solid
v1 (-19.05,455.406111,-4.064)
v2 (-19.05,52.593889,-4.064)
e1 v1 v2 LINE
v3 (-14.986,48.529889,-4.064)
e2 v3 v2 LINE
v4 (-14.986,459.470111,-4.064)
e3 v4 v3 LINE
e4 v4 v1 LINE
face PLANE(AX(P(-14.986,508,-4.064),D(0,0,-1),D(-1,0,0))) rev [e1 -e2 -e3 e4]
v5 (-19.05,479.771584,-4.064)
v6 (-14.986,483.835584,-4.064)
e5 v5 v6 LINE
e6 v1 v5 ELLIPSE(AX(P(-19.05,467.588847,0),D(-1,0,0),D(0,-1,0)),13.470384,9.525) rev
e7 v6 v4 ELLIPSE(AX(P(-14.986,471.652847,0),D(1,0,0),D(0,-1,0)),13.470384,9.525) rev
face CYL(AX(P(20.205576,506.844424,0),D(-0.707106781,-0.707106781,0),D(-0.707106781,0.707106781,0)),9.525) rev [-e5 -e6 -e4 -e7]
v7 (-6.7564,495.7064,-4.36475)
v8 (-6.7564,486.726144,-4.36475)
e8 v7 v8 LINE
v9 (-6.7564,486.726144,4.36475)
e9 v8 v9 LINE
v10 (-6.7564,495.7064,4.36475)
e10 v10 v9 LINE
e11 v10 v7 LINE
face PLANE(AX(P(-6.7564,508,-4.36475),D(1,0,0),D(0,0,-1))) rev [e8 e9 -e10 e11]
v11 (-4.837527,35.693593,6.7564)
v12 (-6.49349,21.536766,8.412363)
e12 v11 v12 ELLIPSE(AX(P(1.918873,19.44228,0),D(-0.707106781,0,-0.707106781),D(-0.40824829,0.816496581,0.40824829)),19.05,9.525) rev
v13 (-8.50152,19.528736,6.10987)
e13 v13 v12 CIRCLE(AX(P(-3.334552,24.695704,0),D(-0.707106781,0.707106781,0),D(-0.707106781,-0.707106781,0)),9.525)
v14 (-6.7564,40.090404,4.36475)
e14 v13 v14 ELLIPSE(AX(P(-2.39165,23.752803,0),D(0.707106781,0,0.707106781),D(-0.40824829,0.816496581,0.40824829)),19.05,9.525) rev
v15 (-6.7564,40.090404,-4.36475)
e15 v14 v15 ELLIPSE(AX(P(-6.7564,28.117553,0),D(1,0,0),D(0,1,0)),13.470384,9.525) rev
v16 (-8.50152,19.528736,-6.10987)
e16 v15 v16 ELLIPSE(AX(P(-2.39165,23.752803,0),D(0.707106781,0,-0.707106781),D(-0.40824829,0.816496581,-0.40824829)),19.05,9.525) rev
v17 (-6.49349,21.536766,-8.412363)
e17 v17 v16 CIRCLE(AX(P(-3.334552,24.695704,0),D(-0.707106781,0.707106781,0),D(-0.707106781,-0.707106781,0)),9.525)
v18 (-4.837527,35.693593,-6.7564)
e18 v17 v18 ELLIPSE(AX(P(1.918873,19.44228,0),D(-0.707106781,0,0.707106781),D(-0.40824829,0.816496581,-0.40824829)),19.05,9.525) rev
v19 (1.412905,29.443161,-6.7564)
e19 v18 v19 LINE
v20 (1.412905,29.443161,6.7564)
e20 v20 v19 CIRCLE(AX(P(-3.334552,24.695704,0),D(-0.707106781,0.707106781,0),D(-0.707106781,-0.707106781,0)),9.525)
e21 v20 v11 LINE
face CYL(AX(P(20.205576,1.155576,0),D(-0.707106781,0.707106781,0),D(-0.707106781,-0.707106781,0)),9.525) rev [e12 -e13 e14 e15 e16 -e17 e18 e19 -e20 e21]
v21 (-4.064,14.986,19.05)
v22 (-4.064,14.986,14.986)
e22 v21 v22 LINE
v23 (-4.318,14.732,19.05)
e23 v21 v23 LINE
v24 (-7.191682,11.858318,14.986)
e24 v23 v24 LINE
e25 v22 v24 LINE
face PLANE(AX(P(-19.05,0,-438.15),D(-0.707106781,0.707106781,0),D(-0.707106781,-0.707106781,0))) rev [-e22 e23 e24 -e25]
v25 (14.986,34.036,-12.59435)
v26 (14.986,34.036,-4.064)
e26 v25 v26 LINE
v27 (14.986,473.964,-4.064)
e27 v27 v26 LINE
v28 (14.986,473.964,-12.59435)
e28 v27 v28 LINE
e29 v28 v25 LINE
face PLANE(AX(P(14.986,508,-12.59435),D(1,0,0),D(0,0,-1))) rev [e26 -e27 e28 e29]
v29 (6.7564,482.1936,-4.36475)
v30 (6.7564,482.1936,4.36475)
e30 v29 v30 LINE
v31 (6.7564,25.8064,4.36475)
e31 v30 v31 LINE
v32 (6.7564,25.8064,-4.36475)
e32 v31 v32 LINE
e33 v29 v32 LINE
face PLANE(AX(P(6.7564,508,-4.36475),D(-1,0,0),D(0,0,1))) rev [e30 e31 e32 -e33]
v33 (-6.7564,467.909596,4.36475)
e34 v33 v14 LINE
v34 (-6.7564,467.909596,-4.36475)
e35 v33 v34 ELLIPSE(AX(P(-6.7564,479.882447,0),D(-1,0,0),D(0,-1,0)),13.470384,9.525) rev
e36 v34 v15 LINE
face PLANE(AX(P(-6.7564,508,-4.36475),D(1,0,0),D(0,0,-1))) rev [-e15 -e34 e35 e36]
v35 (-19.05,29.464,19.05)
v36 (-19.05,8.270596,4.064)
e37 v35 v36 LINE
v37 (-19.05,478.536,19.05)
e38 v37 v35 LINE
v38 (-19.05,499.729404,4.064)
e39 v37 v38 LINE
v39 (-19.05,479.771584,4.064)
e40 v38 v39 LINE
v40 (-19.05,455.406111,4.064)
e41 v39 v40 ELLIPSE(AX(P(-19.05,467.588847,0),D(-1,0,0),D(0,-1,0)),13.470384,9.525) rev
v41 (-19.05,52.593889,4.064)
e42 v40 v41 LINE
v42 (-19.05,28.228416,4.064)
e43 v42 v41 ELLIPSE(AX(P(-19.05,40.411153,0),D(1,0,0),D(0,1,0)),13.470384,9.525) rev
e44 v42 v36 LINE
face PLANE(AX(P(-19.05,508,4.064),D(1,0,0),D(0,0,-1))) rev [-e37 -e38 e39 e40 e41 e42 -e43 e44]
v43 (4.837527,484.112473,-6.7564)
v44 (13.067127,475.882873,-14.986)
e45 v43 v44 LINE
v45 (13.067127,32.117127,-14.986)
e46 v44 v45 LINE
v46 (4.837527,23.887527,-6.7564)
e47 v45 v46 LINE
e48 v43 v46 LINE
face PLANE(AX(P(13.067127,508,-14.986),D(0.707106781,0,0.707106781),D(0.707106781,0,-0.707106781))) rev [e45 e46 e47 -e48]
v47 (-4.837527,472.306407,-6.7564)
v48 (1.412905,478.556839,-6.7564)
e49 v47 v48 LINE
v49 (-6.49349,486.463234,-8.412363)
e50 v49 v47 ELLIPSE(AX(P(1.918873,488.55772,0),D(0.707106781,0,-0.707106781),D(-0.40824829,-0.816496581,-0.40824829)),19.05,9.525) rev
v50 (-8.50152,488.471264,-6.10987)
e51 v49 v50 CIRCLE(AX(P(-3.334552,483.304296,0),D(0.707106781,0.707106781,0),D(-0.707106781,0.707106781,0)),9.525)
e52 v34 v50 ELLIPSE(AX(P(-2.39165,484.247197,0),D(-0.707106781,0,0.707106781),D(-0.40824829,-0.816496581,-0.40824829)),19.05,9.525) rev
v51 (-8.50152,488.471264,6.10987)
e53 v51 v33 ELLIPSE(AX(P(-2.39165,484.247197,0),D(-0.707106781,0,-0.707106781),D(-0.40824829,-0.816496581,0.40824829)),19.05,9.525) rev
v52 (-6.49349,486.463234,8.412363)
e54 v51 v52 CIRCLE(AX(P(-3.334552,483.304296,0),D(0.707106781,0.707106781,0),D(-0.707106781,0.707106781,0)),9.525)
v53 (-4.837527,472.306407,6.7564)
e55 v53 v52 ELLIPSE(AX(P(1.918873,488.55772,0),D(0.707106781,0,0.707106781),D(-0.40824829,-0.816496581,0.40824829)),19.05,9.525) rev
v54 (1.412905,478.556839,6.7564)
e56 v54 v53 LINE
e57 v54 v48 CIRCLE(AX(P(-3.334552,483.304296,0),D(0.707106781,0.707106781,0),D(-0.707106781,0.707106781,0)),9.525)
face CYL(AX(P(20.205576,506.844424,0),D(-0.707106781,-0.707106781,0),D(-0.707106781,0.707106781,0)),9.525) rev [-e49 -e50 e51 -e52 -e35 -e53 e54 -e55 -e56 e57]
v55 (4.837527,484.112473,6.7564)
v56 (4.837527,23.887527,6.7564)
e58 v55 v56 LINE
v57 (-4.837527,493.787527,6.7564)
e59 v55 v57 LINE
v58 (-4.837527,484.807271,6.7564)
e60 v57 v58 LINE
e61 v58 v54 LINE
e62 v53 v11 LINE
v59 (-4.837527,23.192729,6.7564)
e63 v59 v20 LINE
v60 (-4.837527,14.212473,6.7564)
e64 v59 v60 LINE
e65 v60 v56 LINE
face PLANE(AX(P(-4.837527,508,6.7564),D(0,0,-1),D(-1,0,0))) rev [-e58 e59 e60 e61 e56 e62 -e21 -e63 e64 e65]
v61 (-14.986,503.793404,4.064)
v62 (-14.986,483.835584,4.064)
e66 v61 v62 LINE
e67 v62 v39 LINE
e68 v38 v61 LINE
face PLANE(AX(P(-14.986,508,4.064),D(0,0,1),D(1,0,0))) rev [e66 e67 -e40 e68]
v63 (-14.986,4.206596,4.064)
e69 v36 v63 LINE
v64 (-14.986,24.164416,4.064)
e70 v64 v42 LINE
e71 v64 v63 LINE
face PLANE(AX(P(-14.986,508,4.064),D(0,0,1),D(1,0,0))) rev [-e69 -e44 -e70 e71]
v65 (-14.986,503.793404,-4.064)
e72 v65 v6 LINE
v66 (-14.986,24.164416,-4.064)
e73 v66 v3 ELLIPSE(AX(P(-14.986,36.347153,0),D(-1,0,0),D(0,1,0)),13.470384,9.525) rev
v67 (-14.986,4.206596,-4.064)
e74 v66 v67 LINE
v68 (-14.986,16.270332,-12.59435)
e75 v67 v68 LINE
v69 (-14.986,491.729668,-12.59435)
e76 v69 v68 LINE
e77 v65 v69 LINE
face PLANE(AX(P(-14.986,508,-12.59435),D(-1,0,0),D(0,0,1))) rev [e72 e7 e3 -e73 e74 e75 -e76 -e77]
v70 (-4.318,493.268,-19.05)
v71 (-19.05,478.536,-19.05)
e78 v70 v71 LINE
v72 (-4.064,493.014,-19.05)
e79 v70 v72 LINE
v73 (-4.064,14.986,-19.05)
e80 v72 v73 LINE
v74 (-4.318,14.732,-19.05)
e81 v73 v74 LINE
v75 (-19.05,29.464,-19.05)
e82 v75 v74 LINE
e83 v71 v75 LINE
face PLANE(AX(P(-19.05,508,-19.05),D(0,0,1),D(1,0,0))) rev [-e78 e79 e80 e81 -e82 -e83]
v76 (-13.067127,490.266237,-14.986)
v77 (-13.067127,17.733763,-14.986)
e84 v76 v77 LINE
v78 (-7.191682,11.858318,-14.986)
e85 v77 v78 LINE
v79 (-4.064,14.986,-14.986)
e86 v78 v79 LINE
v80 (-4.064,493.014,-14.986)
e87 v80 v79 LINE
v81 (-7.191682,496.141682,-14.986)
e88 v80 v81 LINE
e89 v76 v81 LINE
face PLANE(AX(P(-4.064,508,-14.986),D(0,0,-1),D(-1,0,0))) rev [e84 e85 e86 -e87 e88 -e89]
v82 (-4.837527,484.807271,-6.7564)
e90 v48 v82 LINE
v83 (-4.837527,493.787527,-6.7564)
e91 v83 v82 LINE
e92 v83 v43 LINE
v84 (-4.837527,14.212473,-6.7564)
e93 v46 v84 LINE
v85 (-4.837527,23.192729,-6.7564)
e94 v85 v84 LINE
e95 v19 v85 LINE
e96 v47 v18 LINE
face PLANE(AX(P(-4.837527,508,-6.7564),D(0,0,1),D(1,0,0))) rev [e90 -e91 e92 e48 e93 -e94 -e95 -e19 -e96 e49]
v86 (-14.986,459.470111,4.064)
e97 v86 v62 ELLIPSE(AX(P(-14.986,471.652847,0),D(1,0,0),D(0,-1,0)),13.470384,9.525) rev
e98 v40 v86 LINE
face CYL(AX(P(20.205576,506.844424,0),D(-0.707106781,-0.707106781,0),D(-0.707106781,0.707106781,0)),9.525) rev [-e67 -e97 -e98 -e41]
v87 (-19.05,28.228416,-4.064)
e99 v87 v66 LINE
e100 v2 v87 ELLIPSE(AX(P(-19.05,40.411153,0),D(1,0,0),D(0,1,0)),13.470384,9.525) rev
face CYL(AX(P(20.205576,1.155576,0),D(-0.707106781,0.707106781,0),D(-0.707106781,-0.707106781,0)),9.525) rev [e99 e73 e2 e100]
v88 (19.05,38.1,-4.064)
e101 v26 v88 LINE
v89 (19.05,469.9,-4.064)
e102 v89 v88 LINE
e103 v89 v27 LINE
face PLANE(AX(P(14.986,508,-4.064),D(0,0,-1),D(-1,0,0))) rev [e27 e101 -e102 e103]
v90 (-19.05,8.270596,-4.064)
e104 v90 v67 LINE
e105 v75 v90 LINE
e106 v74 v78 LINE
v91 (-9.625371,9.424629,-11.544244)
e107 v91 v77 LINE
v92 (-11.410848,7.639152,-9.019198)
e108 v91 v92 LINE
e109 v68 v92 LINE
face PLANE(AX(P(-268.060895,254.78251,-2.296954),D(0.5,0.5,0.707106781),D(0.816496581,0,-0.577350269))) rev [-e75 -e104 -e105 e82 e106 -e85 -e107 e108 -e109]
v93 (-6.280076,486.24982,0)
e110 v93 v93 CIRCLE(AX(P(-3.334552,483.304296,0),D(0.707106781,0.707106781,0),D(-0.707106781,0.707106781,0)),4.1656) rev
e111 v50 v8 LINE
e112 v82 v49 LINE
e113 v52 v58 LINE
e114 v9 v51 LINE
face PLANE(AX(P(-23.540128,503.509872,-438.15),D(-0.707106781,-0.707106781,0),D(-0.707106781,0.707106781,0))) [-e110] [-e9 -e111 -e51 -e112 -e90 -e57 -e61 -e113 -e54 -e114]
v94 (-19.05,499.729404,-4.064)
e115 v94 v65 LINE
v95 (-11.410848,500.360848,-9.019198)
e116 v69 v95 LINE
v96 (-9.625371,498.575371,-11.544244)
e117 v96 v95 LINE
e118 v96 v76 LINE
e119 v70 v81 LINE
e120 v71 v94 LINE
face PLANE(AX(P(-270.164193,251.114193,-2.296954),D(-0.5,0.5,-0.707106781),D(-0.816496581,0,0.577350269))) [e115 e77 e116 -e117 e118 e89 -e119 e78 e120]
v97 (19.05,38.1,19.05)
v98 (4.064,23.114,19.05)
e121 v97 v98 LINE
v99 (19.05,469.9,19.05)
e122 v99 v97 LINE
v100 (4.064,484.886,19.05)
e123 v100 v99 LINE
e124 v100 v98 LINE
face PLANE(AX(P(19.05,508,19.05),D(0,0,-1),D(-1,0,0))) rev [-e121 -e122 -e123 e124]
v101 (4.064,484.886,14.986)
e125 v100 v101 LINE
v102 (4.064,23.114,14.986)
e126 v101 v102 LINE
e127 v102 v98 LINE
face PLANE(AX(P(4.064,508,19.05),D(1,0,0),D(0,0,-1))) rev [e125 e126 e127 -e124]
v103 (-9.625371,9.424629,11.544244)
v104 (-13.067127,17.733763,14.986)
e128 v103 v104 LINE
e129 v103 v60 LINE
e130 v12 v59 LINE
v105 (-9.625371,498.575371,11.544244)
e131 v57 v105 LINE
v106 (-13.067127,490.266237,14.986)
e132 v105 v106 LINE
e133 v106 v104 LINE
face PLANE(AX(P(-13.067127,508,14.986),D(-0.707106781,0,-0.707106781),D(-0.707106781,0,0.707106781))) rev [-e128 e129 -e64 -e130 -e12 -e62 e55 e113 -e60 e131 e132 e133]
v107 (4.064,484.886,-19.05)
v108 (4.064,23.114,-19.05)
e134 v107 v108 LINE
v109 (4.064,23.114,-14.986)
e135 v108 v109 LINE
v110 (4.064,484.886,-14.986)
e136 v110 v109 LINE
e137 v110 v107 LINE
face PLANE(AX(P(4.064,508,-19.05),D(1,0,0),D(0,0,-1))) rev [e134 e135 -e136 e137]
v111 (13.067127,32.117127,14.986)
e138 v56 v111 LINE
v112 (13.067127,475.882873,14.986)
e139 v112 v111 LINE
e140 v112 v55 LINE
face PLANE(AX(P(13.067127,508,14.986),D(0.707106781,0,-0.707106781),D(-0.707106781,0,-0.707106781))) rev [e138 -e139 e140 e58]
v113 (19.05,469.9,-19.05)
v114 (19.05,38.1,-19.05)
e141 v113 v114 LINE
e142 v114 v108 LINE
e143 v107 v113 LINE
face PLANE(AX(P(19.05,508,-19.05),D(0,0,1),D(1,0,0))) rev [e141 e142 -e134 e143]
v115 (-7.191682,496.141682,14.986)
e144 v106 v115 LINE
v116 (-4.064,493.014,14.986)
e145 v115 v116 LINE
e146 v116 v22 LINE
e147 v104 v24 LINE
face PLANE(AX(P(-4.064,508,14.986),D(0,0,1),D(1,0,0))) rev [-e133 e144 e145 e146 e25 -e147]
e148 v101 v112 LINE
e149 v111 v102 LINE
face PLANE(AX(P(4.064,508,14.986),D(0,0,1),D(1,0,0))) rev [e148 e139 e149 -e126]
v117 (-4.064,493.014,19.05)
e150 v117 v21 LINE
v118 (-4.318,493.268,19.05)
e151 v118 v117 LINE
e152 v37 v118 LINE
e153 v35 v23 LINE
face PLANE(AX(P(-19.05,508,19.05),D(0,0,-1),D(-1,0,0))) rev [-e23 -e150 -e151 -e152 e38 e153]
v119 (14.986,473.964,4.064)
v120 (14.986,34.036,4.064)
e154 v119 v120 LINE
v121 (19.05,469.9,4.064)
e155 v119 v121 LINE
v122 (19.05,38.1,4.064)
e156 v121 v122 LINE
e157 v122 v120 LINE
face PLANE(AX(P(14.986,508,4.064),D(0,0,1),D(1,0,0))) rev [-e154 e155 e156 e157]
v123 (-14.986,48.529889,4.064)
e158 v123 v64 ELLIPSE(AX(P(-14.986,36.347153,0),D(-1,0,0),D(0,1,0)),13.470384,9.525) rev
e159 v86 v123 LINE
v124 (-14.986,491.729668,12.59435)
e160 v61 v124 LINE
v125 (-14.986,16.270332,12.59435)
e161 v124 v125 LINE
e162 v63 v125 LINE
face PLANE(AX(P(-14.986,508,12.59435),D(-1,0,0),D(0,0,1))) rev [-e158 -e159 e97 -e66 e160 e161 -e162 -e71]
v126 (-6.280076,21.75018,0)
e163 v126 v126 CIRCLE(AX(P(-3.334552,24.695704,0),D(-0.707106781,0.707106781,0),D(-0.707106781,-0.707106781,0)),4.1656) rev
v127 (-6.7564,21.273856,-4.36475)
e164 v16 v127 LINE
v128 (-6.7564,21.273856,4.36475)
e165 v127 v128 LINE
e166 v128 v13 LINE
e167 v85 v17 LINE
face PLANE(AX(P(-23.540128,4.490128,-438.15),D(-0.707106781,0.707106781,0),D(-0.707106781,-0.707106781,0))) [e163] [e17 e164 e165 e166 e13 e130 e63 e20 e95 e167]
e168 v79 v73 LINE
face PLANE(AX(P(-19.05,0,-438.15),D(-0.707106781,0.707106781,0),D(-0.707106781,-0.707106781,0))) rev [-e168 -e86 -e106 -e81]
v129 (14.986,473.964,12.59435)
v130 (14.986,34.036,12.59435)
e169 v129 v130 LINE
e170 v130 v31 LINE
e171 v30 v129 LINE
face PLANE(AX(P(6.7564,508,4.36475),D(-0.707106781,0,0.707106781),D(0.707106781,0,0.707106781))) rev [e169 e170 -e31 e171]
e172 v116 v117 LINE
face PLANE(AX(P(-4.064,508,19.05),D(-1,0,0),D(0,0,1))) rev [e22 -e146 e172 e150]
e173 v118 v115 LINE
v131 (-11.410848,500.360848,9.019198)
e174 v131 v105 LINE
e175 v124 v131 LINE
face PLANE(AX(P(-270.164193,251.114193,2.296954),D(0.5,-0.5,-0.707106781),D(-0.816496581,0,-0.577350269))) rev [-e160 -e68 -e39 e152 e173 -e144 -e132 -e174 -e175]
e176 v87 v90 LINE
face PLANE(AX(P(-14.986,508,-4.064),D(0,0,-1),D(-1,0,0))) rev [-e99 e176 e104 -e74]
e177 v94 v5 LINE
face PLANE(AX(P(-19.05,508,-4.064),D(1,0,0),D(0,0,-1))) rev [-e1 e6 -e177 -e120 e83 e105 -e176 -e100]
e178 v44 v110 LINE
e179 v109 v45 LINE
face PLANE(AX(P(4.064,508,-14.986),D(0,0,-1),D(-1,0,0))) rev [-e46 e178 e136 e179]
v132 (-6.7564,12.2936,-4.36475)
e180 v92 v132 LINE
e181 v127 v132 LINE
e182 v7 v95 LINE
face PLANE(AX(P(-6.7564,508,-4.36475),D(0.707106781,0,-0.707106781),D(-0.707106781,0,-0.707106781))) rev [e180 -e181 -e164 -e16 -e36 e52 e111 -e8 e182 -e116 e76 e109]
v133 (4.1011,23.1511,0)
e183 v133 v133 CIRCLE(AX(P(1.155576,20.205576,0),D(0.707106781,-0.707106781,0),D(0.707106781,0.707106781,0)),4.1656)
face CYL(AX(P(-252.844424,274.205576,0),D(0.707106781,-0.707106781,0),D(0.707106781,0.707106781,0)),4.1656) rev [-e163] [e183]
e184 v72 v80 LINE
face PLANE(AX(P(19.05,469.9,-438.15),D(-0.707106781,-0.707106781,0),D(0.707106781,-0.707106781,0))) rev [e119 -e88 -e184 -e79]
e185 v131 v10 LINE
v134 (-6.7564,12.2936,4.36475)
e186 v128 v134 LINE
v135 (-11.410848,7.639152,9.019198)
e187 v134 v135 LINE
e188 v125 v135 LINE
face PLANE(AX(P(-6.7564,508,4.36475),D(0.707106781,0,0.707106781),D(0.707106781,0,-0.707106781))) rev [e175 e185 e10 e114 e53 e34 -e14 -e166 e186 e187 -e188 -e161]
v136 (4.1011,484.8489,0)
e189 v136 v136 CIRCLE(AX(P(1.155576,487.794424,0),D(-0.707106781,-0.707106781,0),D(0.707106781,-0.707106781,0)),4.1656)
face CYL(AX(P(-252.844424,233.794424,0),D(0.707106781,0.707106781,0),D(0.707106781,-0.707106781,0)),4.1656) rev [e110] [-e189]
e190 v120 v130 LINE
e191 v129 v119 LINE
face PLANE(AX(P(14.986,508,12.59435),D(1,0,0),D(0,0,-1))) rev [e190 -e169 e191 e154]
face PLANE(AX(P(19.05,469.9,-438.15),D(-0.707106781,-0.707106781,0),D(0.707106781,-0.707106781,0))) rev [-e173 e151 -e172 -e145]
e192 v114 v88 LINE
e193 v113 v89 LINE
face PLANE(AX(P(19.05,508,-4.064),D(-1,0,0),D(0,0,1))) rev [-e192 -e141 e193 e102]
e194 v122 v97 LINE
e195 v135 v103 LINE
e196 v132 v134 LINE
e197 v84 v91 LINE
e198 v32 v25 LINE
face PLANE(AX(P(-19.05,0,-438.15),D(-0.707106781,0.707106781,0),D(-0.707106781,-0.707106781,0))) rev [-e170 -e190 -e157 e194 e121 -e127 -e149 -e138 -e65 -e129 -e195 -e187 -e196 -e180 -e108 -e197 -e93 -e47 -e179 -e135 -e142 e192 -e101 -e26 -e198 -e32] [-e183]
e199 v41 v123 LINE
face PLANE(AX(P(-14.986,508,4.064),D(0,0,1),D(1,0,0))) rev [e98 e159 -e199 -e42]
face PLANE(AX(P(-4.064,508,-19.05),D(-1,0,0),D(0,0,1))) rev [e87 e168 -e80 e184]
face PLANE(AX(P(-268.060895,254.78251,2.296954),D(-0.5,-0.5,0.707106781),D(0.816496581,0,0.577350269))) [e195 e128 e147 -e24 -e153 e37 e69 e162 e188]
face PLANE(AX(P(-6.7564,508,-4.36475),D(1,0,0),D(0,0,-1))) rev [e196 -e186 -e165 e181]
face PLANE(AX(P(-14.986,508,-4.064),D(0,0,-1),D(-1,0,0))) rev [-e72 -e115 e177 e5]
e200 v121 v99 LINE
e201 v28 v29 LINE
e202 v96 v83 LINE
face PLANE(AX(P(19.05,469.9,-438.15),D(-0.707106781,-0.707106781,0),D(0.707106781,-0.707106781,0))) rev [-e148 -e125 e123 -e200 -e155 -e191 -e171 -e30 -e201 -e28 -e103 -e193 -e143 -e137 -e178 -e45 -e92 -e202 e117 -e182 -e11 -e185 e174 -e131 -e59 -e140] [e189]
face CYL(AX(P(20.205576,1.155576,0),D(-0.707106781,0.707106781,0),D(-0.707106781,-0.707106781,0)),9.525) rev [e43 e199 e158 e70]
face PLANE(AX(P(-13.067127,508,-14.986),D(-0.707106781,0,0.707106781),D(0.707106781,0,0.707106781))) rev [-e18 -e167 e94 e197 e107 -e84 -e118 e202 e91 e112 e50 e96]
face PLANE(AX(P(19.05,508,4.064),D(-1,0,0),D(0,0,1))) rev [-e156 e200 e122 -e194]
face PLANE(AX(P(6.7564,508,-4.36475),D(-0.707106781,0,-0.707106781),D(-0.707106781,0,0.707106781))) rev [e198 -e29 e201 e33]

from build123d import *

# Parameters (mm, degrees)
EXTRUDE1_DEPTH       = 508
EXTRUDE2_DEPTH       = 457.2
SKETCH6_R            = 4.1656
EXTRUDE5_DEPTH       = 500.656640854
SKETCH8_R            = 9.525
EXTRUDE7_DEPTH       = 44.45
EXTRUDE8_DEPTH       = 374.167192757
MIRROR7_COPY_1_DEPTH = 374.167192757


# Read off the part's stored shape, not the designer's step: 1515<1>
with BuildPart() as part:
    # Sketch1<2> → Extrude1 (new body)
    with BuildSketch(Plane(origin=(0, 0, 0), x_dir=(1, 0, 0), z_dir=(0, 1, 0))):
        Polygon((-6.7564, 4.364749804), (-6.7564, -4.364749804), (-14.986, -12.594349804), (-14.986, -4.064), (-19.05, -4.064), (-19.05, -19.05), (-4.064, -19.05), (-4.064, -14.986), (-13.067127258, -14.986), (-4.837527258, -6.7564), (4.837527258, -6.7564), (13.067127258, -14.986), (4.064, -14.986), (4.064, -19.05), (19.05, -19.05), (19.05, -4.064), (14.986, -4.064), (14.986, -12.594349804), (6.7564, -4.364749804), (6.7564, 4.364749804), (14.986, 12.594349804), (14.986, 4.064), (19.05, 4.064), (19.05, 19.05), (4.064, 19.05), (4.064, 14.986), (13.067127258, 14.986), (4.837527258, 6.7564), (-4.837527258, 6.7564), (-13.067127258, 14.986), (-4.064, 14.986), (-4.064, 19.05), (-19.05, 19.05), (-19.05, 4.064), (-14.986, 4.064), (-14.986, 12.594349804), align=None)
    extrude(amount=EXTRUDE1_DEPTH)

    # Sketch2 → Extrude2 (cut)
    with BuildSketch(Plane.XY.offset(19.05)):
        Polygon((-19.05, 508), (19.05, 508), (19.05, 469.9), align=None)
        Polygon((-19.05, 0), (19.05, 38.1), (19.05, 0), align=None)
    extrude(amount=-EXTRUDE2_DEPTH, mode=Mode.SUBTRACT)

    # Sketch6 → Extrude5 (cut, through all)
    with BuildSketch(Plane(origin=(-9.525, 9.525, 0), x_dir=(0, 0, -1), z_dir=(0.7071067811865436, -0.7071067811865515, 0))):
        with Locations(Location((0, 15.104615818, 0), (0, 0, 90))):
            Circle(SKETCH6_R)
    extrude5 = extrude(amount=-EXTRUDE5_DEPTH, mode=Mode.SUBTRACT)

    # Sketch8 → Extrude7 (cut)
    with BuildSketch(Plane(origin=(-45.446024484, 45.446024484, 0), x_dir=(0.7071067811865515, 0.7071067811865436, 0), z_dir=(0.7071067811865436, -0.7071067811865515, 0))):
        with Locations((15.104615818, 0)):
            Circle(SKETCH8_R)
    extrude7 = extrude(amount=EXTRUDE7_DEPTH, mode=Mode.SUBTRACT)

    # Mirror5: Extrude5, Extrude7 across plane
    add(extrude5.mirror(Plane.ZX.offset(254)), mode=Mode.SUBTRACT)
    add(extrude7.mirror(Plane.ZX.offset(254)), mode=Mode.SUBTRACT)

    # Sketch10 → Extrude8 (cut, through all)
    with BuildSketch(Plane(origin=(244.475, 244.475, 0), x_dir=(0, 0, -1), z_dir=(0.7071067811865436, 0.7071067811865515, 0))):
        Polygon((-19.05, 372.680629024), (-2.29695366, 372.680629024), (-2.29695366, 368.599481163), (-19.05, 351.846434823), align=None)
    extrude8 = extrude(amount=-EXTRUDE8_DEPTH, mode=Mode.SUBTRACT)

    # Mirror6: Extrude8 across plane
    add(extrude8.mirror(Plane.XY), mode=Mode.SUBTRACT)

    # Mirror7: Extrude8 across plane
    add(extrude8.mirror(Plane.ZX.offset(254)), mode=Mode.SUBTRACT)

    # Mirror7 copy 1 sketch → Mirror7 copy 1 (cut, through all)
    with BuildSketch(Plane(origin=(244.475, 263.525, 0), x_dir=(0, 0, 1), z_dir=(0.7071067811865436, -0.7071067811865515, 0))):
        Polygon((-19.05, 372.680629024), (-2.29695366, 372.680629024), (-2.29695366, 368.599481163), (-19.05, 351.846434823), align=None)
    extrude(amount=-MIRROR7_COPY_1_DEPTH, mode=Mode.SUBTRACT)


solid = part.part
